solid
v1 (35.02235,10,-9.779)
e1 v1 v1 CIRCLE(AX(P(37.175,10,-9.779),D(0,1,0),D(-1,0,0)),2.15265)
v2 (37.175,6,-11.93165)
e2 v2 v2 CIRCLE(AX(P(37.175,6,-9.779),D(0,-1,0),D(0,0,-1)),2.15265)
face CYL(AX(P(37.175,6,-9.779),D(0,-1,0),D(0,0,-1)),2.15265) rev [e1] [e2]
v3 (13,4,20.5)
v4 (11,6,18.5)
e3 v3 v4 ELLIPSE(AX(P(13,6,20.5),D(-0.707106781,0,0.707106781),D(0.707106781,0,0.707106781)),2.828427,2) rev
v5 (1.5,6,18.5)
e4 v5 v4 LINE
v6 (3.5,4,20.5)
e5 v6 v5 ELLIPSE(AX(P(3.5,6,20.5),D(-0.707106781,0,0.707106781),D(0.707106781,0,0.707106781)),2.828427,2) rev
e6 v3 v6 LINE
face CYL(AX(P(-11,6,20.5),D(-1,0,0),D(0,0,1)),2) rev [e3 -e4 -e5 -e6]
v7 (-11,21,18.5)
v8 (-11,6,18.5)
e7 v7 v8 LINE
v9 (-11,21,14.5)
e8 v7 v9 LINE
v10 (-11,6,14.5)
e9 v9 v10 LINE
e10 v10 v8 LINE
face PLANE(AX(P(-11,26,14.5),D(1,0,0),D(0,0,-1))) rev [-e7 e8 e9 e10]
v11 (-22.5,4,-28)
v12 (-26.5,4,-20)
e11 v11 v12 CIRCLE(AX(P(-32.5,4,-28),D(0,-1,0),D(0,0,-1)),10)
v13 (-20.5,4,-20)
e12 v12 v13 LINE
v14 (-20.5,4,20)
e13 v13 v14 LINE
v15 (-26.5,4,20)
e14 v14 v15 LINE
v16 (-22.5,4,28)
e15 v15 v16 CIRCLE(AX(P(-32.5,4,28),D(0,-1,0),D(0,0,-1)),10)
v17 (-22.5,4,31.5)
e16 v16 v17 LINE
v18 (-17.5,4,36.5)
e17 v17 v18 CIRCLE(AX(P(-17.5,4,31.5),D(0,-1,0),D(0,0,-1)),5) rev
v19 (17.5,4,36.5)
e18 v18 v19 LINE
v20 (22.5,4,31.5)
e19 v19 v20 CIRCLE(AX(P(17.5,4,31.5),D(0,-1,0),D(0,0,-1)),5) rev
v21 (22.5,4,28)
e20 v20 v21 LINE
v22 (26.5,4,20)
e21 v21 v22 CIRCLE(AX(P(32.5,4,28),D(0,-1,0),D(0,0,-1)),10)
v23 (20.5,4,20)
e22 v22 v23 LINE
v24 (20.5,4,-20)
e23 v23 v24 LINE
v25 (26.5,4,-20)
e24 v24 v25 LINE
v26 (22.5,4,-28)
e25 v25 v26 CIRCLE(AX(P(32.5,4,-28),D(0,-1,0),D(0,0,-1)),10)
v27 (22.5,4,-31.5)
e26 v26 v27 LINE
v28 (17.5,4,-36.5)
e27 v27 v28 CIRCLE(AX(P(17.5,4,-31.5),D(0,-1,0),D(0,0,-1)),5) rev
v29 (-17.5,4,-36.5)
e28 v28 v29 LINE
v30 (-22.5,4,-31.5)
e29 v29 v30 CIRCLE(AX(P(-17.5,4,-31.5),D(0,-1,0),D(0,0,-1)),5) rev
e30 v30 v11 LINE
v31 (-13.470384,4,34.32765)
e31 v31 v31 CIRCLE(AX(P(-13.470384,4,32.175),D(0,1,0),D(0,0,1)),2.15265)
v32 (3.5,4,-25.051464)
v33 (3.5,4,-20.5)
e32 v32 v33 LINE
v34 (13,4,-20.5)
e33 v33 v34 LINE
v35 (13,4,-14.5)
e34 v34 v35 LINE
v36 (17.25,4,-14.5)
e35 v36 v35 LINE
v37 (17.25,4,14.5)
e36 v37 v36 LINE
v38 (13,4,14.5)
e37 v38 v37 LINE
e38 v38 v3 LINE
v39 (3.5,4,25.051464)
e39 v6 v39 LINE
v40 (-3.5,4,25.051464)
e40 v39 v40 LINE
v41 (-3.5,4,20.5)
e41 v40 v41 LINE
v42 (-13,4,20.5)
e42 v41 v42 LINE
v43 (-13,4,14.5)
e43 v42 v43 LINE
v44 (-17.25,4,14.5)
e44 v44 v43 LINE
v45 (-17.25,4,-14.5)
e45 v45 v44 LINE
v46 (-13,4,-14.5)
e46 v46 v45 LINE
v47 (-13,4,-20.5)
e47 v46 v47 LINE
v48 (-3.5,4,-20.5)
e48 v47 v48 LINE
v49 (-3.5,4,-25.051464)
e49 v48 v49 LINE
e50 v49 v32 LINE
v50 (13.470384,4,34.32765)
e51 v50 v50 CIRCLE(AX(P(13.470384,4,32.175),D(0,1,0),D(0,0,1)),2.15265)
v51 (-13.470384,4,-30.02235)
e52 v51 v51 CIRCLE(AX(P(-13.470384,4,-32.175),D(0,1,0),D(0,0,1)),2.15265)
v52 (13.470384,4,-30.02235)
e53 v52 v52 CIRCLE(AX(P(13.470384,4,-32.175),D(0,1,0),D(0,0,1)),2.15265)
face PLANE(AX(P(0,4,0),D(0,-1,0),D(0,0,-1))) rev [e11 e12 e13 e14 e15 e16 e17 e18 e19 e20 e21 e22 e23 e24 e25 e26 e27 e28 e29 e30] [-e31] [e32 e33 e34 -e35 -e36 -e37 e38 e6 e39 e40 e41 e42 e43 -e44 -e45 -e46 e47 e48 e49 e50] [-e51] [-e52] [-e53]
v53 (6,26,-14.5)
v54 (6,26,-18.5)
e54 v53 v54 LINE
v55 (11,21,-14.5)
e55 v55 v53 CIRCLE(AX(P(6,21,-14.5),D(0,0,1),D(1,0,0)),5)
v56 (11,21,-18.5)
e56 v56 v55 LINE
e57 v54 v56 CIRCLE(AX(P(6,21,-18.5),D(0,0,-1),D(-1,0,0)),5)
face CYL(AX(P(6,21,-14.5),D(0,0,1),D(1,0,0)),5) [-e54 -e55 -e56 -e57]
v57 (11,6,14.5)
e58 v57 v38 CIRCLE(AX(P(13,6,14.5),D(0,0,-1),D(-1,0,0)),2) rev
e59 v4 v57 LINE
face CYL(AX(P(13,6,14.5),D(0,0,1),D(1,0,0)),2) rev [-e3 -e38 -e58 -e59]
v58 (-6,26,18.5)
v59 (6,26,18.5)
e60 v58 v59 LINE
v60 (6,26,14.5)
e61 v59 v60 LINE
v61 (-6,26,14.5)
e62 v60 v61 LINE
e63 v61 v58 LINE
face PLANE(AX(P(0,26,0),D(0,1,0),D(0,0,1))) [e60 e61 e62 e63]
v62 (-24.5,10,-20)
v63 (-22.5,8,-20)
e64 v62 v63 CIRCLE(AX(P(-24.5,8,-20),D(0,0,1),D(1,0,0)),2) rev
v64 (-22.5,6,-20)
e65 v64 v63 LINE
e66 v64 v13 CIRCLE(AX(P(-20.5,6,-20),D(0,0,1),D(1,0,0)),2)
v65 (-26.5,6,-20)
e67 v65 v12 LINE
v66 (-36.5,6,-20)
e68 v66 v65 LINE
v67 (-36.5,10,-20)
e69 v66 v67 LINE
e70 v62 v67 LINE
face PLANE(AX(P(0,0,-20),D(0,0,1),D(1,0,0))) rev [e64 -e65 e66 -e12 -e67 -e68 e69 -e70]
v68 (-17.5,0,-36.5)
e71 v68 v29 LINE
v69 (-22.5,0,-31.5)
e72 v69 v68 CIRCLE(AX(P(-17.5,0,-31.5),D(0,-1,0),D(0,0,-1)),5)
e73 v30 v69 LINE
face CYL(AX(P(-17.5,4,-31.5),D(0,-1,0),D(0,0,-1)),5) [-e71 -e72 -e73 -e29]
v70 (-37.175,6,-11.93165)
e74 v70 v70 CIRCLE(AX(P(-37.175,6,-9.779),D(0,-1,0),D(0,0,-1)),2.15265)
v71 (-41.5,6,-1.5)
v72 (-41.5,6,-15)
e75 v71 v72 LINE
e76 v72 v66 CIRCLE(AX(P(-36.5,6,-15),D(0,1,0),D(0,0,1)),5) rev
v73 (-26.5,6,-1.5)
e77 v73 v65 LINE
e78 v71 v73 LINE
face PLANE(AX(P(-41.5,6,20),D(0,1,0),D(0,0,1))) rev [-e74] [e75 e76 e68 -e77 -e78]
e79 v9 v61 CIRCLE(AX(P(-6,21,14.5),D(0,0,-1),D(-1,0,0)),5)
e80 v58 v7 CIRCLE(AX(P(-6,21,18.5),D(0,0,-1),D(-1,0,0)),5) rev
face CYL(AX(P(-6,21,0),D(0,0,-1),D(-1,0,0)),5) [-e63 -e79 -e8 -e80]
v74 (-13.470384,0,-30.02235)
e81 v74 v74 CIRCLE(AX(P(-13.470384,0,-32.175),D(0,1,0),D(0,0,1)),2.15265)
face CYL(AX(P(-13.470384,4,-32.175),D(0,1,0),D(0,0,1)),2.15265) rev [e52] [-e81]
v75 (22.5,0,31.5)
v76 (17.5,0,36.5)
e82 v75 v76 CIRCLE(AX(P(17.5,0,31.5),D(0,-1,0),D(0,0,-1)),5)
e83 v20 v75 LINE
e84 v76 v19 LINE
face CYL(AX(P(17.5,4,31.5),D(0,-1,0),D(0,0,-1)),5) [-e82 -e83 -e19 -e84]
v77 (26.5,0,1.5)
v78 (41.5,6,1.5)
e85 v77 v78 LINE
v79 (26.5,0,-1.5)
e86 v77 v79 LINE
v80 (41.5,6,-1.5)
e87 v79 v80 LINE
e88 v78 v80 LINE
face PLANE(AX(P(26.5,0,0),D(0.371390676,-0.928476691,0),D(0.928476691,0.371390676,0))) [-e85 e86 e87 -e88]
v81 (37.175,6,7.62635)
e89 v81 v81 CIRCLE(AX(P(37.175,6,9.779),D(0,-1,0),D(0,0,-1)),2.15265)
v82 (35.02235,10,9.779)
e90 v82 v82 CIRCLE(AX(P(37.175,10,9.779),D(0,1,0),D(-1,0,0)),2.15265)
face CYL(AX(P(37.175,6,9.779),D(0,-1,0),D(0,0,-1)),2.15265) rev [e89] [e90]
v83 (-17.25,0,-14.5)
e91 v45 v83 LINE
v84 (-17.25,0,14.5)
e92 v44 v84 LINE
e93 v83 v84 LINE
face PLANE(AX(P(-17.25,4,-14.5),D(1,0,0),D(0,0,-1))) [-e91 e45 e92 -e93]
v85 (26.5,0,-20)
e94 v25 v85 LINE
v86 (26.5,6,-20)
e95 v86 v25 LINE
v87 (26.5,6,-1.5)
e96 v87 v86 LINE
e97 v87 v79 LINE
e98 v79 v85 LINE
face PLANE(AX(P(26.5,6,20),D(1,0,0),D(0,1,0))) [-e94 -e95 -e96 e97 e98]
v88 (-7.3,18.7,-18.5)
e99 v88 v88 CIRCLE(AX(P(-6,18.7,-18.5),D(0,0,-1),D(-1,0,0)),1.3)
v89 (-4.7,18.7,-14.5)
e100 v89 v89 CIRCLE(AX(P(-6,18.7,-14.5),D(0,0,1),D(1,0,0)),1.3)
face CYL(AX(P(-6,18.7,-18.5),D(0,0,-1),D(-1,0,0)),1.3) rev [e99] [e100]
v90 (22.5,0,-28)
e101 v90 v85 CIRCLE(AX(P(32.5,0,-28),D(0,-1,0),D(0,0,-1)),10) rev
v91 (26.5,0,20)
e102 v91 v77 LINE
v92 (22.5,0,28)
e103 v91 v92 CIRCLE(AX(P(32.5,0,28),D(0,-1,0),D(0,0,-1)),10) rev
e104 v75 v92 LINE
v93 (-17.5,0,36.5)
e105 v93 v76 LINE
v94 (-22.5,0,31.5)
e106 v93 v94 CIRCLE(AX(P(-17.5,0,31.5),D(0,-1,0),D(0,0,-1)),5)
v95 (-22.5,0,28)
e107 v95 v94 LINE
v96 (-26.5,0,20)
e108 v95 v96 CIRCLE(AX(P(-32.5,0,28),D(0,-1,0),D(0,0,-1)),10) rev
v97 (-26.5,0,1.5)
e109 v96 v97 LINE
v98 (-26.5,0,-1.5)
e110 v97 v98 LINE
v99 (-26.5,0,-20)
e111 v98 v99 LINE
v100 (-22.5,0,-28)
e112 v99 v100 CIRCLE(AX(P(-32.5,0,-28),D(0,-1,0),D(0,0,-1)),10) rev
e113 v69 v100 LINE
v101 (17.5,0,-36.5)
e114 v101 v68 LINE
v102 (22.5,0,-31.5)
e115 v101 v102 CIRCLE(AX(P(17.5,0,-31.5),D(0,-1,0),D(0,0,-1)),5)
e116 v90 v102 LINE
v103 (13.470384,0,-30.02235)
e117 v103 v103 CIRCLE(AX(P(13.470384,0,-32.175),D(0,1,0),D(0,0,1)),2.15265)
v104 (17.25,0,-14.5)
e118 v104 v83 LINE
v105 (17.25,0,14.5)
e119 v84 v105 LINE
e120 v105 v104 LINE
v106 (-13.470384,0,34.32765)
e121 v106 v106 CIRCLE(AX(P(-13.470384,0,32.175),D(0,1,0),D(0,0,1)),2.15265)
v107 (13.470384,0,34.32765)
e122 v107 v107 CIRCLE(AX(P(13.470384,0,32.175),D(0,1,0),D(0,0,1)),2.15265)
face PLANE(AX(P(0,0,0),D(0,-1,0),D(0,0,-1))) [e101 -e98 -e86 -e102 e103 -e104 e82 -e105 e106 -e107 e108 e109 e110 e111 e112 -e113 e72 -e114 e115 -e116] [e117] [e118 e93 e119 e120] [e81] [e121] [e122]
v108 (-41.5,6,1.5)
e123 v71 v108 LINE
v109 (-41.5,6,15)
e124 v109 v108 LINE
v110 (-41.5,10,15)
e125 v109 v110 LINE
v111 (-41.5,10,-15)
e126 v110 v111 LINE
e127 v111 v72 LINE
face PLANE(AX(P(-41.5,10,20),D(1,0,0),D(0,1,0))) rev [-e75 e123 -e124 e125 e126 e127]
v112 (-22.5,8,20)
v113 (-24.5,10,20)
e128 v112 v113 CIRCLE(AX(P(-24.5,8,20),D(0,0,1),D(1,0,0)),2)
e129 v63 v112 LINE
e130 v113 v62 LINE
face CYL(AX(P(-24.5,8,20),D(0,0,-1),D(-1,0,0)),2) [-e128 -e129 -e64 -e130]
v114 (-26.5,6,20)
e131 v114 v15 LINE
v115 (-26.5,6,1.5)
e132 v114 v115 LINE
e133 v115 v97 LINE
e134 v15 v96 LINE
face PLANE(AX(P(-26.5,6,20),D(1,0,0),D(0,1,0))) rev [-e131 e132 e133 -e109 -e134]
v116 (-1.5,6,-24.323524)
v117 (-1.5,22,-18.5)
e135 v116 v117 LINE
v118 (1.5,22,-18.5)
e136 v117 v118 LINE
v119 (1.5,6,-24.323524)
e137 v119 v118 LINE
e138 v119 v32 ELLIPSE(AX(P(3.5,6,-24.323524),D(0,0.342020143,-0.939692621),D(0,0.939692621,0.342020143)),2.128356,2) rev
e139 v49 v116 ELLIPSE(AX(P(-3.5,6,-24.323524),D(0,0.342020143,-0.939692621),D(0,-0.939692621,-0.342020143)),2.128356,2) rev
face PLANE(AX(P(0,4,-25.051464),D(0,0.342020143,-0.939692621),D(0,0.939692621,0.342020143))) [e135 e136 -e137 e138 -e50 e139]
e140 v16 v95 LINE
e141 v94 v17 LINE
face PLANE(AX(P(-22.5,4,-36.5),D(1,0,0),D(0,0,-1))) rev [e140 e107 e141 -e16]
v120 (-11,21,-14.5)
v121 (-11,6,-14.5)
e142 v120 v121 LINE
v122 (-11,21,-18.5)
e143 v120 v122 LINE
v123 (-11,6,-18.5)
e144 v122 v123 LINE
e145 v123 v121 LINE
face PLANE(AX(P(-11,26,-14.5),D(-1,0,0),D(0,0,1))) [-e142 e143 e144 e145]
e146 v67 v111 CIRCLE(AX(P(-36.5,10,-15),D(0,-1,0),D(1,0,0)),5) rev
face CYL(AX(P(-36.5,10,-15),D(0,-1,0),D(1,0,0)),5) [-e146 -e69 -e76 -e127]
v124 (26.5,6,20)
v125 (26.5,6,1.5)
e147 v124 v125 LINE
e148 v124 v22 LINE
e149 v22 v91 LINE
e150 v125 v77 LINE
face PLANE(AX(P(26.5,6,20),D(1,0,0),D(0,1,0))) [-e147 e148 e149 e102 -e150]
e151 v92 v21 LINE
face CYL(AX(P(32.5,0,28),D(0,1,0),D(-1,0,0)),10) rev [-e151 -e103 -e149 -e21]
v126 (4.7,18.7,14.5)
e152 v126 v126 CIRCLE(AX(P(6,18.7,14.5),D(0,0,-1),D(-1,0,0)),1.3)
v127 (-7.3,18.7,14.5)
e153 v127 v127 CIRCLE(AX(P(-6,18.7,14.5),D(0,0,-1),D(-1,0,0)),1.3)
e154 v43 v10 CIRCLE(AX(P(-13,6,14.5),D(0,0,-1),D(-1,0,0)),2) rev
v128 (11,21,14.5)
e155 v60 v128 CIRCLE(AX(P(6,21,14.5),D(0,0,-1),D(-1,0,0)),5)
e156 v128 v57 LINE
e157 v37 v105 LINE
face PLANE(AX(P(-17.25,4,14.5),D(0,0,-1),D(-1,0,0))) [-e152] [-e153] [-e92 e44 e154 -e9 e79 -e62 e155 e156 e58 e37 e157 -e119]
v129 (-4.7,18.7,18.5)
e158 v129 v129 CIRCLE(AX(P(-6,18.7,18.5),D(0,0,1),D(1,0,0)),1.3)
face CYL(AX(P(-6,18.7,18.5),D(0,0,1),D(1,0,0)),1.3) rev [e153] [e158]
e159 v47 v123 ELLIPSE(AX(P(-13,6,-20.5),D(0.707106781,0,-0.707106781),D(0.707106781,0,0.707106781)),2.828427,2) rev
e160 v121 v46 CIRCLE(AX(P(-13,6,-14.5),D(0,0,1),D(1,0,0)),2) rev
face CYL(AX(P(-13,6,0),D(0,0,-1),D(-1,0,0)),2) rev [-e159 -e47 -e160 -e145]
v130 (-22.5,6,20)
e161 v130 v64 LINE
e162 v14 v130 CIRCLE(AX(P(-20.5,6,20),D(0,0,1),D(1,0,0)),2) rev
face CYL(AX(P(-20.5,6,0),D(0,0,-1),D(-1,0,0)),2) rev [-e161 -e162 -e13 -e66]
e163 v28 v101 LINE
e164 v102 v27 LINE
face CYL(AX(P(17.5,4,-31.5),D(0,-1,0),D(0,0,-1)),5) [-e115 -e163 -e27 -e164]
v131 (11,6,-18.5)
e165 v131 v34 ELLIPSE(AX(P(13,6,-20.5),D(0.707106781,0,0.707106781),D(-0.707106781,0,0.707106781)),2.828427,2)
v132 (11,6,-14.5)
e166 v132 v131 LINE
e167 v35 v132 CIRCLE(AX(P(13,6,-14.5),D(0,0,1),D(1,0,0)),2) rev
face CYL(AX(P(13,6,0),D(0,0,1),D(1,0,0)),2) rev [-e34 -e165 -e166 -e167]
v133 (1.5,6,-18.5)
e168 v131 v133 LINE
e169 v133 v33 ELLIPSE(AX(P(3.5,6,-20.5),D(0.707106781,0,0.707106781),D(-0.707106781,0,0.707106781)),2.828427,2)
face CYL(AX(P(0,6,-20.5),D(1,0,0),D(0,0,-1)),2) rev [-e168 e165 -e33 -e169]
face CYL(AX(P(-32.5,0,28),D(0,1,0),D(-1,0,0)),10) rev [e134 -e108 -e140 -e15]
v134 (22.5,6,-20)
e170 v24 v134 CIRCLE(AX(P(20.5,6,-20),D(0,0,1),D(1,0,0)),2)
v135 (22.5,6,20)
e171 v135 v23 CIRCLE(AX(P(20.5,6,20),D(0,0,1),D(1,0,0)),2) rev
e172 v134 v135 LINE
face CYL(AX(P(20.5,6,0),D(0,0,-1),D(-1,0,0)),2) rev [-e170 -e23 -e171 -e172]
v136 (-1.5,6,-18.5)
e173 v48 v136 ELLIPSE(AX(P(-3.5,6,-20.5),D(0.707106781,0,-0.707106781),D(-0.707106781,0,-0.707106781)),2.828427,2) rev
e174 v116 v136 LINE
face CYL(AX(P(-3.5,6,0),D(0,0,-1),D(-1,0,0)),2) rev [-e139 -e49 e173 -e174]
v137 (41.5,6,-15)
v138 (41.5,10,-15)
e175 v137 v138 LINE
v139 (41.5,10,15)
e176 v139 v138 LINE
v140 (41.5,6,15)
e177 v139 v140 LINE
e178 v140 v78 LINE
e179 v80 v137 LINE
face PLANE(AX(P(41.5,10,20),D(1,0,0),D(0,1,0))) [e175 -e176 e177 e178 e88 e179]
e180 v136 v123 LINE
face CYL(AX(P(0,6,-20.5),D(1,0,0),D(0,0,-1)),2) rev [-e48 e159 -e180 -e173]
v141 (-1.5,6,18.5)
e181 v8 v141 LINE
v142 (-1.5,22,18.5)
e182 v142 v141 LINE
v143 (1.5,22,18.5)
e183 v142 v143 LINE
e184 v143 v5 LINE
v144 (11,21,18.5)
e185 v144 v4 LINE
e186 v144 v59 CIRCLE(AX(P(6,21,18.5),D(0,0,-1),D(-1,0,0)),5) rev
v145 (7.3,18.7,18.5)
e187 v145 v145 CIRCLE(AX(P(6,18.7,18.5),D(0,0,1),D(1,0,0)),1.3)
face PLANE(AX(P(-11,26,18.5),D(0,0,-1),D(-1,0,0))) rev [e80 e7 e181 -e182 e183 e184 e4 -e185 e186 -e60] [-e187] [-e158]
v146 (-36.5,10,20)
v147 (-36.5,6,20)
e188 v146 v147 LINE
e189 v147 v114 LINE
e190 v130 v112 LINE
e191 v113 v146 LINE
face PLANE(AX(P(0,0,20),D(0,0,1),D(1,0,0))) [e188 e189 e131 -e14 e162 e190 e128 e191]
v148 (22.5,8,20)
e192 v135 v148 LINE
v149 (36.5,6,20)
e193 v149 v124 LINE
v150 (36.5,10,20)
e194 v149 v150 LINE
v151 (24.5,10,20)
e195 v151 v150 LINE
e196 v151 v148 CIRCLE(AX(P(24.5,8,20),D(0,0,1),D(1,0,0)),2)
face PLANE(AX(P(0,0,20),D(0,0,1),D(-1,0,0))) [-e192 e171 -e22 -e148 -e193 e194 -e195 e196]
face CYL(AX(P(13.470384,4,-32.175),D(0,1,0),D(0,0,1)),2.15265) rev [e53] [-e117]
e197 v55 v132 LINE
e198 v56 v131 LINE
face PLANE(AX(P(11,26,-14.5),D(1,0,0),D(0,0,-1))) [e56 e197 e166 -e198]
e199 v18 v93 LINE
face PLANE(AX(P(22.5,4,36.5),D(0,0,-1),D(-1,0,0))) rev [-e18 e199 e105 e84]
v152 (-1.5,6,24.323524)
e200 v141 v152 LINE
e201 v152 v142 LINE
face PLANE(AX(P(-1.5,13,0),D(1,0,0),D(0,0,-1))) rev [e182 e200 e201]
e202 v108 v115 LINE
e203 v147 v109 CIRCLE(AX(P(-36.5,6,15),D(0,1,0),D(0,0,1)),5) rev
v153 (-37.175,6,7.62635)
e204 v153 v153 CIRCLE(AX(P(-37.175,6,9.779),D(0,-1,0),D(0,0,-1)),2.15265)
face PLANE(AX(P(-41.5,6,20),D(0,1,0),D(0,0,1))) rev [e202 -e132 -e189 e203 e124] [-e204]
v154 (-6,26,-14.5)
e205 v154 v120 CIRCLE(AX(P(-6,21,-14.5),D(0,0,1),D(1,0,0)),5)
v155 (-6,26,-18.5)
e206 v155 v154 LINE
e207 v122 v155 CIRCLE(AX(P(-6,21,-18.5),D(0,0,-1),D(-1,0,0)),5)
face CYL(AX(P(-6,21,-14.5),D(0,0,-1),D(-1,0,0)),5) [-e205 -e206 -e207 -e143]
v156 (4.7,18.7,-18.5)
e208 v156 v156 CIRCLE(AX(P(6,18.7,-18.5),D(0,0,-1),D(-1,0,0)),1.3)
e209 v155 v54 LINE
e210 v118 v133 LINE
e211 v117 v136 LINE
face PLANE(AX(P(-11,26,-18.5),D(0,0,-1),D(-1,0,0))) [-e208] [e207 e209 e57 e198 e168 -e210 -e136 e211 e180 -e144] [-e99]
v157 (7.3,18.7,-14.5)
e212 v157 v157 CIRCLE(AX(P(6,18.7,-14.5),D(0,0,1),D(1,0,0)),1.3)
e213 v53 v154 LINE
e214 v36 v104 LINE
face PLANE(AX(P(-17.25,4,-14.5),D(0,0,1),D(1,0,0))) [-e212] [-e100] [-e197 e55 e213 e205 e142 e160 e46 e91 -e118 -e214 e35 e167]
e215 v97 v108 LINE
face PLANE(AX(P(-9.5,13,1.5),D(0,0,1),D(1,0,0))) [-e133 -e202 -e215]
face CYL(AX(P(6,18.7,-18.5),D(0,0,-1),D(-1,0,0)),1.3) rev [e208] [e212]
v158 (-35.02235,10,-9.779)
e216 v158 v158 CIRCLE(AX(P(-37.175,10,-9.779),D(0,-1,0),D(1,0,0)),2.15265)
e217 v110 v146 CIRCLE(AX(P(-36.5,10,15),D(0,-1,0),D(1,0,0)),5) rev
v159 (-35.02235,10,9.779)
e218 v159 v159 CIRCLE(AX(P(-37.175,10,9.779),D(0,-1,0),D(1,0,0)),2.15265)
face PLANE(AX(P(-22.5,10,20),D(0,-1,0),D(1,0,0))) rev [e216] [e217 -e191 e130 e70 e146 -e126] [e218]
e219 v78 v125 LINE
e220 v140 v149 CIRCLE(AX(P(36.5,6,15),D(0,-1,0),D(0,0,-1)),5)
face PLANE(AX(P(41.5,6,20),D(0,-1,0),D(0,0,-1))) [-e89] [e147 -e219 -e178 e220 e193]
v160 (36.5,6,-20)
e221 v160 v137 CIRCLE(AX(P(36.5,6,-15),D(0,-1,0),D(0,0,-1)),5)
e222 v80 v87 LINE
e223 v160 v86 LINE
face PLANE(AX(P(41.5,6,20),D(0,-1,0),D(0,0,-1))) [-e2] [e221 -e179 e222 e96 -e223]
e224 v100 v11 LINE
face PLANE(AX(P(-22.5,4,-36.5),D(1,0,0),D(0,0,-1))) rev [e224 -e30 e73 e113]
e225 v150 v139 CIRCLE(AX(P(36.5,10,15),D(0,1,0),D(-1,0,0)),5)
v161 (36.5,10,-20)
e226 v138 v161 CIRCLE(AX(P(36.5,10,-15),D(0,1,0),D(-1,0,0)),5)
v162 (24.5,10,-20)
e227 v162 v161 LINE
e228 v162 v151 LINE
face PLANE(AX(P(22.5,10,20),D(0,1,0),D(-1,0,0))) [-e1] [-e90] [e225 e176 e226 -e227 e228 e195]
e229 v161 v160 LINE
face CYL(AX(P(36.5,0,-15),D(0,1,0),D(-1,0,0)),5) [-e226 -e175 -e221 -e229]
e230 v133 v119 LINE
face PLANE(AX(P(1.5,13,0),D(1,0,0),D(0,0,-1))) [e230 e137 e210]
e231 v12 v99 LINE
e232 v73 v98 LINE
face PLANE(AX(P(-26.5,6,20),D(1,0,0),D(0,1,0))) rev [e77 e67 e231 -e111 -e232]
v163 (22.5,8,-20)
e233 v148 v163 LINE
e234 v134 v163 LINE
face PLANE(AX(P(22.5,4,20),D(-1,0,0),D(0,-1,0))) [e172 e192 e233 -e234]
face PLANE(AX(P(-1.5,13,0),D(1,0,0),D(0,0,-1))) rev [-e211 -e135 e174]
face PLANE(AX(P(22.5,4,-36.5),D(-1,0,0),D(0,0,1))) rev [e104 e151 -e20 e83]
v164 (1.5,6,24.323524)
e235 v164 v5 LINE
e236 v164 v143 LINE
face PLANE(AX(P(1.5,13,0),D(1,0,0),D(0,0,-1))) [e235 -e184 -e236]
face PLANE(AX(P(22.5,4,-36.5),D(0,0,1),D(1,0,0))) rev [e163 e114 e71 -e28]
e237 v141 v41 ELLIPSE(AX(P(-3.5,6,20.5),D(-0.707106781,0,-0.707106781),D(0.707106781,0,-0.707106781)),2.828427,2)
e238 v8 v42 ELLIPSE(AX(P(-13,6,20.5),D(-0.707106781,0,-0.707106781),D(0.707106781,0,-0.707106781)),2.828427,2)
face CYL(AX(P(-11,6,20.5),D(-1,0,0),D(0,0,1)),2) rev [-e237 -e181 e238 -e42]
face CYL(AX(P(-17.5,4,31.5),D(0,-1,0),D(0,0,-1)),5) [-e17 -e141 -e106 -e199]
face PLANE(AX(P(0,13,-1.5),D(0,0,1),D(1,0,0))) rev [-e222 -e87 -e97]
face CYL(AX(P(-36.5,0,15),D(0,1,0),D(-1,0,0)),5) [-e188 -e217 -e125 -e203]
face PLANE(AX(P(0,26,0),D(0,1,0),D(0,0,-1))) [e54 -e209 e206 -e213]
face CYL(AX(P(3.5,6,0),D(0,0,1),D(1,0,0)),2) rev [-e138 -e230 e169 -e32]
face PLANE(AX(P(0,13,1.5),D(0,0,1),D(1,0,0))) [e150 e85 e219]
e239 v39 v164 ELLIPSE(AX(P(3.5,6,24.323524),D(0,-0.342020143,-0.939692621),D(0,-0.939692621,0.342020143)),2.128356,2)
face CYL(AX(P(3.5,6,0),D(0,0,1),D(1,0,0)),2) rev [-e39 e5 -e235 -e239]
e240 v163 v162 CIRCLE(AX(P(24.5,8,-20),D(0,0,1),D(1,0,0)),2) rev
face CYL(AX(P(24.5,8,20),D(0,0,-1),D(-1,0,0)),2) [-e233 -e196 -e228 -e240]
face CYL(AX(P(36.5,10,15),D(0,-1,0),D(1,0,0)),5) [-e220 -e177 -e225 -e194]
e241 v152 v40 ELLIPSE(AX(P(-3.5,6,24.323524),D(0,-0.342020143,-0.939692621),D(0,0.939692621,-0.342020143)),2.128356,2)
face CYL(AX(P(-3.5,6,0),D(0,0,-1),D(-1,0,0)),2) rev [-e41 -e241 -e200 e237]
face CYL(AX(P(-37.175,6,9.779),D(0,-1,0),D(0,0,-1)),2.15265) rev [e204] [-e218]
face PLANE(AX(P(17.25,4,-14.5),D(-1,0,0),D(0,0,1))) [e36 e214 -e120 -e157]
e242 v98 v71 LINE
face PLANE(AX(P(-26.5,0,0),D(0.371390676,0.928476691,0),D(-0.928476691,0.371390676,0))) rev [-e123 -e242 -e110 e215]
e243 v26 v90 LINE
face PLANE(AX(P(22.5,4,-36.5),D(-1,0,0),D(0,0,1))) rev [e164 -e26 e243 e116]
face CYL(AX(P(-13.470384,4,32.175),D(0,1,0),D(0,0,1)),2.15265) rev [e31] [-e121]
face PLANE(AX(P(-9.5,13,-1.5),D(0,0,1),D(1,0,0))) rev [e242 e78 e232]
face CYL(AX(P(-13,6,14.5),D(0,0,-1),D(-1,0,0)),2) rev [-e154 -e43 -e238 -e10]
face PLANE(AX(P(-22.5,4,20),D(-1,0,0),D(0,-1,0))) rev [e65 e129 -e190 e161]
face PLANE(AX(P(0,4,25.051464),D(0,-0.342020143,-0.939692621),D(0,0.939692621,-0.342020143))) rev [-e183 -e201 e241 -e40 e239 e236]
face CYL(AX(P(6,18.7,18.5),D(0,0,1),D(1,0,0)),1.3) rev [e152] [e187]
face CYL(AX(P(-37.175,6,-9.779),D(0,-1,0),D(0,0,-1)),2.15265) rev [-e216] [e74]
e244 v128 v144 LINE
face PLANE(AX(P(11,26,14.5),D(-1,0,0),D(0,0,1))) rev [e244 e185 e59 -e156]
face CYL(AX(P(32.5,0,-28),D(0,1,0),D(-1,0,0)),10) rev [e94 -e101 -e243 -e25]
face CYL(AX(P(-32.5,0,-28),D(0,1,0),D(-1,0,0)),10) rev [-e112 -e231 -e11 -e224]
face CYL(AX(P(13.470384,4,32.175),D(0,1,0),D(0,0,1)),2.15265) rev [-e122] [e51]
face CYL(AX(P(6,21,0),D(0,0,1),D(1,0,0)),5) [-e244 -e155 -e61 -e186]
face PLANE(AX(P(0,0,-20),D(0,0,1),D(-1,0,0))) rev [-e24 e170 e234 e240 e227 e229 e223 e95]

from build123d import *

# Parameters (mm, degrees)
SKETCH1_W             = 45
SKETCH1_H             = 73
SKETCH1_W_2           = 34.5
SKETCH1_H_2           = 29
BOSS_EXTRUDE1_DEPTH   = 4
BOSS_EXTRUDE2_DEPTH   = 20
SKETCH6_W             = 22
SKETCH6_H             = 4
BOSS_EXTRUDE3_DEPTH   = 22
F_6_CLEARANCE_HOLE1_D = 4.3053
F_6_CLEARANCE_HOLE2_D = 4.3053
M2_CLEARANCE_HOLE1_D  = 2.6
RIB3_REACH            = 63.078
SKETCH12_WALL_W       = 140.31113285
SKETCH12_WALL_H       = 3
RIB4_REACH            = 63.078
SKETCH13_WALL_W       = 143.310838334
SKETCH13_WALL_H       = 3
FILLET2_R             = 2
FILLET3_R             = 5
FILLET4_R             = 10


with BuildPart() as part:
    # Sketch1 → Boss-Extrude1 (new body)
    with BuildSketch(Plane(origin=(0, 0, 0), x_dir=(1, 0, 0), z_dir=(0, 1, 0))):
        Rectangle(SKETCH1_W, SKETCH1_H)
        Rectangle(SKETCH1_W_2, SKETCH1_H_2, mode=Mode.SUBTRACT)
    extrude(amount=BOSS_EXTRUDE1_DEPTH)

    # Sketch2 → Boss-Extrude2 (add, symmetric)
    with BuildSketch(Plane.XY):
        Polygon((-22.5, 4), (-22.5, 10), (-41.5, 10), (-41.5, 6), (-26.5, 6), (-26.5, 0), (-22.5, 0), align=None)
    boss_extrude2 = extrude(amount=BOSS_EXTRUDE2_DEPTH, both=True)

    # Sketch6 → Boss-Extrude3 (add)
    with BuildSketch(Plane(origin=(0, 4, 0), x_dir=(1, 0, 0), z_dir=(0, 1, 0))):
        with Locations((0, -16.5)):
            Rectangle(SKETCH6_W, SKETCH6_H)
    boss_extrude3 = extrude(amount=BOSS_EXTRUDE3_DEPTH)

    # #6 Clearance Hole1 (through all)
    with Locations(Plane(origin=(0, 6, 0), x_dir=(-1, 0, 0), z_dir=(0, -1, 0))):
        with Locations((37.175, -9.779), (37.175, 9.779)):
            f_6_clearance_hole1 = Hole(F_6_CLEARANCE_HOLE1_D / 2)

    # #6 Clearance Hole2 (through all)
    with Locations(Plane(origin=(0, 4, 0), x_dir=(1, 0, 0), z_dir=(0, 1, 0))):
        with Locations((-13.470384182, -32.175), (13.470384182, -32.175)):
            f_6_clearance_hole2 = Hole(F_6_CLEARANCE_HOLE2_D / 2)

    # M2 Clearance Hole1 (through all)
    with Locations(Plane.XY.offset(18.5)):
        with Locations((6, 18.7), (-6, 18.7)):
            m2_clearance_hole1 = Hole(M2_CLEARANCE_HOLE1_D / 2)

    # Sketch12 wall → Rib3 (add, up to next)
    with BuildSketch(Plane(origin=(-34, 3, 0), x_dir=(-0.928476690885, 0.371390676354, 0), z_dir=(-0.371390676354, -0.928476690885, 0)), mode=Mode.PRIVATE) as rib3_sk1:
        Rectangle(SKETCH12_WALL_W, SKETCH12_WALL_H)
    rib3_tool1 = extrude(rib3_sk1.sketch, amount=-RIB3_REACH, mode=Mode.PRIVATE) - part.part
    rib3 = rib3_tool1.solids().sort_by_distance((-34, 3, 0))[0]
    add(rib3)

    # Sketch13 wall → Rib4 (add, up to next)
    with BuildSketch(Plane(origin=(0, 13, 21.775732109), x_dir=(0, 0.939692620782, -0.342020143335), z_dir=(0, 0.342020143335, 0.939692620782)), mode=Mode.PRIVATE) as rib4_sk1:
        Rectangle(SKETCH13_WALL_W, SKETCH13_WALL_H)
    rib4_tool1 = extrude(rib4_sk1.sketch, amount=-RIB4_REACH, mode=Mode.PRIVATE) - part.part
    rib4 = rib4_tool1.solids().sort_by_distance((0, 13, 21.775732109))[0]
    add(rib4)

    # Mirror1: Boss-Extrude3, #6 Clearance Hole2, M2 Clearance Hole1, Rib4 across plane
    add(boss_extrude3.mirror(Plane.XY))
    add(f_6_clearance_hole2.mirror(Plane.XY), mode=Mode.SUBTRACT)
    add(m2_clearance_hole1.mirror(Plane.XY), mode=Mode.SUBTRACT)
    add(rib4.mirror(Plane.XY))

    # Mirror4: Boss-Extrude2, #6 Clearance Hole1, Rib3 across plane
    add(boss_extrude2.mirror(Plane(origin=(0, 0, 0), x_dir=(0, 0, 1), z_dir=(1, 0, 0))))
    add(f_6_clearance_hole1.mirror(Plane(origin=(0, 0, 0), x_dir=(0, 0, 1), z_dir=(1, 0, 0))), mode=Mode.SUBTRACT)
    add(rib3.mirror(Plane(origin=(0, 0, 0), x_dir=(0, 0, 1), z_dir=(1, 0, 0))))

    # Fillet2
    fillet2_edges = [part.edges().sort_by_distance(p)[0] for p in [
        (6.25, 4, 18.5),
        (1.5, 4, 21.775732109),
        (-1.5, 4, 21.775732109),
        (-11, 4, -16.5),
        (-6.25, 4, -18.5),
        (11, 4, -16.5),
        (6.25, 4, -18.5),
        (1.5, 4, -21.775732109),
        (-1.5, 4, -21.775732109),
        (22.5, 4, 0),
        (22.5, 10, 0),
        (-22.5, 4, 0),
        (-22.5, 10, 0),
        (-11, 4, 16.5),
        (-6.25, 4, 18.5),
        (11, 4, 16.5),
    ]]
    fillet(fillet2_edges, radius=FILLET2_R)

    # Fillet3
    fillet3_edges = [part.edges().sort_by_distance(p)[0] for p in [
        (-11, 26, -16.5),
        (11, 26, -16.5),
        (41.5, 8, 20),
        (41.5, 8, -20),
        (-41.5, 8, -20),
        (-41.5, 8, 20),
        (-11, 26, 16.5),
        (11, 26, 16.5),
        (-22.5, 2, -36.5),
        (22.5, 2, -36.5),
        (22.5, 2, 36.5),
        (-22.5, 2, 36.5),
    ]]
    fillet(fillet3_edges, radius=FILLET3_R)

    # Fillet4
    # the kernel refuses this fillet: 10 mm, written as the material it adds along each edge
    with BuildSketch(Plane(origin=(22.5, 4, 20), x_dir=(1, 0, 0), z_dir=(0, -1, 0))) as fillet4_piece_1:
        with BuildLine():
            CenterArc((10, 8), FILLET4_R, 180, 53.130102354)
            Line((0, 8), (0, 0))
            Line((0, 0), (4, 0))
        make_face()
    extrude(amount=4)
    with BuildSketch(Plane(origin=(22.5, 0, -20), x_dir=(0, 0, -1), z_dir=(0, 1, 0))) as fillet4_piece_2:
        with BuildLine():
            CenterArc((8, -10), FILLET4_R, 90, 53.130102354)
            Line((0, -4), (0, 0))
            Line((0, 0), (8, 0))
        make_face()
    extrude(amount=4)
    with BuildSketch(Plane(origin=(-22.5, 0, -20), x_dir=(0, 0, -1), z_dir=(0, 1, 0))) as fillet4_piece_3:
        with BuildLine():
            CenterArc((8, 10), FILLET4_R, 216.869897646, 53.130102354)
            Line((0, 4), (0, 0))
            Line((0, 0), (8, 0))
        make_face()
    extrude(amount=4)
    with BuildSketch(Plane(origin=(-22.5, 4, 20), x_dir=(-1, 0, 0), z_dir=(0, -1, 0))) as fillet4_piece_4:
        with BuildLine():
            CenterArc((10, -8), FILLET4_R, 126.869897646, 53.130102354)
            Line((0, -8), (0, 0))
            Line((0, 0), (4, 0))
        make_face()
    extrude(amount=4)


solid = part.part
